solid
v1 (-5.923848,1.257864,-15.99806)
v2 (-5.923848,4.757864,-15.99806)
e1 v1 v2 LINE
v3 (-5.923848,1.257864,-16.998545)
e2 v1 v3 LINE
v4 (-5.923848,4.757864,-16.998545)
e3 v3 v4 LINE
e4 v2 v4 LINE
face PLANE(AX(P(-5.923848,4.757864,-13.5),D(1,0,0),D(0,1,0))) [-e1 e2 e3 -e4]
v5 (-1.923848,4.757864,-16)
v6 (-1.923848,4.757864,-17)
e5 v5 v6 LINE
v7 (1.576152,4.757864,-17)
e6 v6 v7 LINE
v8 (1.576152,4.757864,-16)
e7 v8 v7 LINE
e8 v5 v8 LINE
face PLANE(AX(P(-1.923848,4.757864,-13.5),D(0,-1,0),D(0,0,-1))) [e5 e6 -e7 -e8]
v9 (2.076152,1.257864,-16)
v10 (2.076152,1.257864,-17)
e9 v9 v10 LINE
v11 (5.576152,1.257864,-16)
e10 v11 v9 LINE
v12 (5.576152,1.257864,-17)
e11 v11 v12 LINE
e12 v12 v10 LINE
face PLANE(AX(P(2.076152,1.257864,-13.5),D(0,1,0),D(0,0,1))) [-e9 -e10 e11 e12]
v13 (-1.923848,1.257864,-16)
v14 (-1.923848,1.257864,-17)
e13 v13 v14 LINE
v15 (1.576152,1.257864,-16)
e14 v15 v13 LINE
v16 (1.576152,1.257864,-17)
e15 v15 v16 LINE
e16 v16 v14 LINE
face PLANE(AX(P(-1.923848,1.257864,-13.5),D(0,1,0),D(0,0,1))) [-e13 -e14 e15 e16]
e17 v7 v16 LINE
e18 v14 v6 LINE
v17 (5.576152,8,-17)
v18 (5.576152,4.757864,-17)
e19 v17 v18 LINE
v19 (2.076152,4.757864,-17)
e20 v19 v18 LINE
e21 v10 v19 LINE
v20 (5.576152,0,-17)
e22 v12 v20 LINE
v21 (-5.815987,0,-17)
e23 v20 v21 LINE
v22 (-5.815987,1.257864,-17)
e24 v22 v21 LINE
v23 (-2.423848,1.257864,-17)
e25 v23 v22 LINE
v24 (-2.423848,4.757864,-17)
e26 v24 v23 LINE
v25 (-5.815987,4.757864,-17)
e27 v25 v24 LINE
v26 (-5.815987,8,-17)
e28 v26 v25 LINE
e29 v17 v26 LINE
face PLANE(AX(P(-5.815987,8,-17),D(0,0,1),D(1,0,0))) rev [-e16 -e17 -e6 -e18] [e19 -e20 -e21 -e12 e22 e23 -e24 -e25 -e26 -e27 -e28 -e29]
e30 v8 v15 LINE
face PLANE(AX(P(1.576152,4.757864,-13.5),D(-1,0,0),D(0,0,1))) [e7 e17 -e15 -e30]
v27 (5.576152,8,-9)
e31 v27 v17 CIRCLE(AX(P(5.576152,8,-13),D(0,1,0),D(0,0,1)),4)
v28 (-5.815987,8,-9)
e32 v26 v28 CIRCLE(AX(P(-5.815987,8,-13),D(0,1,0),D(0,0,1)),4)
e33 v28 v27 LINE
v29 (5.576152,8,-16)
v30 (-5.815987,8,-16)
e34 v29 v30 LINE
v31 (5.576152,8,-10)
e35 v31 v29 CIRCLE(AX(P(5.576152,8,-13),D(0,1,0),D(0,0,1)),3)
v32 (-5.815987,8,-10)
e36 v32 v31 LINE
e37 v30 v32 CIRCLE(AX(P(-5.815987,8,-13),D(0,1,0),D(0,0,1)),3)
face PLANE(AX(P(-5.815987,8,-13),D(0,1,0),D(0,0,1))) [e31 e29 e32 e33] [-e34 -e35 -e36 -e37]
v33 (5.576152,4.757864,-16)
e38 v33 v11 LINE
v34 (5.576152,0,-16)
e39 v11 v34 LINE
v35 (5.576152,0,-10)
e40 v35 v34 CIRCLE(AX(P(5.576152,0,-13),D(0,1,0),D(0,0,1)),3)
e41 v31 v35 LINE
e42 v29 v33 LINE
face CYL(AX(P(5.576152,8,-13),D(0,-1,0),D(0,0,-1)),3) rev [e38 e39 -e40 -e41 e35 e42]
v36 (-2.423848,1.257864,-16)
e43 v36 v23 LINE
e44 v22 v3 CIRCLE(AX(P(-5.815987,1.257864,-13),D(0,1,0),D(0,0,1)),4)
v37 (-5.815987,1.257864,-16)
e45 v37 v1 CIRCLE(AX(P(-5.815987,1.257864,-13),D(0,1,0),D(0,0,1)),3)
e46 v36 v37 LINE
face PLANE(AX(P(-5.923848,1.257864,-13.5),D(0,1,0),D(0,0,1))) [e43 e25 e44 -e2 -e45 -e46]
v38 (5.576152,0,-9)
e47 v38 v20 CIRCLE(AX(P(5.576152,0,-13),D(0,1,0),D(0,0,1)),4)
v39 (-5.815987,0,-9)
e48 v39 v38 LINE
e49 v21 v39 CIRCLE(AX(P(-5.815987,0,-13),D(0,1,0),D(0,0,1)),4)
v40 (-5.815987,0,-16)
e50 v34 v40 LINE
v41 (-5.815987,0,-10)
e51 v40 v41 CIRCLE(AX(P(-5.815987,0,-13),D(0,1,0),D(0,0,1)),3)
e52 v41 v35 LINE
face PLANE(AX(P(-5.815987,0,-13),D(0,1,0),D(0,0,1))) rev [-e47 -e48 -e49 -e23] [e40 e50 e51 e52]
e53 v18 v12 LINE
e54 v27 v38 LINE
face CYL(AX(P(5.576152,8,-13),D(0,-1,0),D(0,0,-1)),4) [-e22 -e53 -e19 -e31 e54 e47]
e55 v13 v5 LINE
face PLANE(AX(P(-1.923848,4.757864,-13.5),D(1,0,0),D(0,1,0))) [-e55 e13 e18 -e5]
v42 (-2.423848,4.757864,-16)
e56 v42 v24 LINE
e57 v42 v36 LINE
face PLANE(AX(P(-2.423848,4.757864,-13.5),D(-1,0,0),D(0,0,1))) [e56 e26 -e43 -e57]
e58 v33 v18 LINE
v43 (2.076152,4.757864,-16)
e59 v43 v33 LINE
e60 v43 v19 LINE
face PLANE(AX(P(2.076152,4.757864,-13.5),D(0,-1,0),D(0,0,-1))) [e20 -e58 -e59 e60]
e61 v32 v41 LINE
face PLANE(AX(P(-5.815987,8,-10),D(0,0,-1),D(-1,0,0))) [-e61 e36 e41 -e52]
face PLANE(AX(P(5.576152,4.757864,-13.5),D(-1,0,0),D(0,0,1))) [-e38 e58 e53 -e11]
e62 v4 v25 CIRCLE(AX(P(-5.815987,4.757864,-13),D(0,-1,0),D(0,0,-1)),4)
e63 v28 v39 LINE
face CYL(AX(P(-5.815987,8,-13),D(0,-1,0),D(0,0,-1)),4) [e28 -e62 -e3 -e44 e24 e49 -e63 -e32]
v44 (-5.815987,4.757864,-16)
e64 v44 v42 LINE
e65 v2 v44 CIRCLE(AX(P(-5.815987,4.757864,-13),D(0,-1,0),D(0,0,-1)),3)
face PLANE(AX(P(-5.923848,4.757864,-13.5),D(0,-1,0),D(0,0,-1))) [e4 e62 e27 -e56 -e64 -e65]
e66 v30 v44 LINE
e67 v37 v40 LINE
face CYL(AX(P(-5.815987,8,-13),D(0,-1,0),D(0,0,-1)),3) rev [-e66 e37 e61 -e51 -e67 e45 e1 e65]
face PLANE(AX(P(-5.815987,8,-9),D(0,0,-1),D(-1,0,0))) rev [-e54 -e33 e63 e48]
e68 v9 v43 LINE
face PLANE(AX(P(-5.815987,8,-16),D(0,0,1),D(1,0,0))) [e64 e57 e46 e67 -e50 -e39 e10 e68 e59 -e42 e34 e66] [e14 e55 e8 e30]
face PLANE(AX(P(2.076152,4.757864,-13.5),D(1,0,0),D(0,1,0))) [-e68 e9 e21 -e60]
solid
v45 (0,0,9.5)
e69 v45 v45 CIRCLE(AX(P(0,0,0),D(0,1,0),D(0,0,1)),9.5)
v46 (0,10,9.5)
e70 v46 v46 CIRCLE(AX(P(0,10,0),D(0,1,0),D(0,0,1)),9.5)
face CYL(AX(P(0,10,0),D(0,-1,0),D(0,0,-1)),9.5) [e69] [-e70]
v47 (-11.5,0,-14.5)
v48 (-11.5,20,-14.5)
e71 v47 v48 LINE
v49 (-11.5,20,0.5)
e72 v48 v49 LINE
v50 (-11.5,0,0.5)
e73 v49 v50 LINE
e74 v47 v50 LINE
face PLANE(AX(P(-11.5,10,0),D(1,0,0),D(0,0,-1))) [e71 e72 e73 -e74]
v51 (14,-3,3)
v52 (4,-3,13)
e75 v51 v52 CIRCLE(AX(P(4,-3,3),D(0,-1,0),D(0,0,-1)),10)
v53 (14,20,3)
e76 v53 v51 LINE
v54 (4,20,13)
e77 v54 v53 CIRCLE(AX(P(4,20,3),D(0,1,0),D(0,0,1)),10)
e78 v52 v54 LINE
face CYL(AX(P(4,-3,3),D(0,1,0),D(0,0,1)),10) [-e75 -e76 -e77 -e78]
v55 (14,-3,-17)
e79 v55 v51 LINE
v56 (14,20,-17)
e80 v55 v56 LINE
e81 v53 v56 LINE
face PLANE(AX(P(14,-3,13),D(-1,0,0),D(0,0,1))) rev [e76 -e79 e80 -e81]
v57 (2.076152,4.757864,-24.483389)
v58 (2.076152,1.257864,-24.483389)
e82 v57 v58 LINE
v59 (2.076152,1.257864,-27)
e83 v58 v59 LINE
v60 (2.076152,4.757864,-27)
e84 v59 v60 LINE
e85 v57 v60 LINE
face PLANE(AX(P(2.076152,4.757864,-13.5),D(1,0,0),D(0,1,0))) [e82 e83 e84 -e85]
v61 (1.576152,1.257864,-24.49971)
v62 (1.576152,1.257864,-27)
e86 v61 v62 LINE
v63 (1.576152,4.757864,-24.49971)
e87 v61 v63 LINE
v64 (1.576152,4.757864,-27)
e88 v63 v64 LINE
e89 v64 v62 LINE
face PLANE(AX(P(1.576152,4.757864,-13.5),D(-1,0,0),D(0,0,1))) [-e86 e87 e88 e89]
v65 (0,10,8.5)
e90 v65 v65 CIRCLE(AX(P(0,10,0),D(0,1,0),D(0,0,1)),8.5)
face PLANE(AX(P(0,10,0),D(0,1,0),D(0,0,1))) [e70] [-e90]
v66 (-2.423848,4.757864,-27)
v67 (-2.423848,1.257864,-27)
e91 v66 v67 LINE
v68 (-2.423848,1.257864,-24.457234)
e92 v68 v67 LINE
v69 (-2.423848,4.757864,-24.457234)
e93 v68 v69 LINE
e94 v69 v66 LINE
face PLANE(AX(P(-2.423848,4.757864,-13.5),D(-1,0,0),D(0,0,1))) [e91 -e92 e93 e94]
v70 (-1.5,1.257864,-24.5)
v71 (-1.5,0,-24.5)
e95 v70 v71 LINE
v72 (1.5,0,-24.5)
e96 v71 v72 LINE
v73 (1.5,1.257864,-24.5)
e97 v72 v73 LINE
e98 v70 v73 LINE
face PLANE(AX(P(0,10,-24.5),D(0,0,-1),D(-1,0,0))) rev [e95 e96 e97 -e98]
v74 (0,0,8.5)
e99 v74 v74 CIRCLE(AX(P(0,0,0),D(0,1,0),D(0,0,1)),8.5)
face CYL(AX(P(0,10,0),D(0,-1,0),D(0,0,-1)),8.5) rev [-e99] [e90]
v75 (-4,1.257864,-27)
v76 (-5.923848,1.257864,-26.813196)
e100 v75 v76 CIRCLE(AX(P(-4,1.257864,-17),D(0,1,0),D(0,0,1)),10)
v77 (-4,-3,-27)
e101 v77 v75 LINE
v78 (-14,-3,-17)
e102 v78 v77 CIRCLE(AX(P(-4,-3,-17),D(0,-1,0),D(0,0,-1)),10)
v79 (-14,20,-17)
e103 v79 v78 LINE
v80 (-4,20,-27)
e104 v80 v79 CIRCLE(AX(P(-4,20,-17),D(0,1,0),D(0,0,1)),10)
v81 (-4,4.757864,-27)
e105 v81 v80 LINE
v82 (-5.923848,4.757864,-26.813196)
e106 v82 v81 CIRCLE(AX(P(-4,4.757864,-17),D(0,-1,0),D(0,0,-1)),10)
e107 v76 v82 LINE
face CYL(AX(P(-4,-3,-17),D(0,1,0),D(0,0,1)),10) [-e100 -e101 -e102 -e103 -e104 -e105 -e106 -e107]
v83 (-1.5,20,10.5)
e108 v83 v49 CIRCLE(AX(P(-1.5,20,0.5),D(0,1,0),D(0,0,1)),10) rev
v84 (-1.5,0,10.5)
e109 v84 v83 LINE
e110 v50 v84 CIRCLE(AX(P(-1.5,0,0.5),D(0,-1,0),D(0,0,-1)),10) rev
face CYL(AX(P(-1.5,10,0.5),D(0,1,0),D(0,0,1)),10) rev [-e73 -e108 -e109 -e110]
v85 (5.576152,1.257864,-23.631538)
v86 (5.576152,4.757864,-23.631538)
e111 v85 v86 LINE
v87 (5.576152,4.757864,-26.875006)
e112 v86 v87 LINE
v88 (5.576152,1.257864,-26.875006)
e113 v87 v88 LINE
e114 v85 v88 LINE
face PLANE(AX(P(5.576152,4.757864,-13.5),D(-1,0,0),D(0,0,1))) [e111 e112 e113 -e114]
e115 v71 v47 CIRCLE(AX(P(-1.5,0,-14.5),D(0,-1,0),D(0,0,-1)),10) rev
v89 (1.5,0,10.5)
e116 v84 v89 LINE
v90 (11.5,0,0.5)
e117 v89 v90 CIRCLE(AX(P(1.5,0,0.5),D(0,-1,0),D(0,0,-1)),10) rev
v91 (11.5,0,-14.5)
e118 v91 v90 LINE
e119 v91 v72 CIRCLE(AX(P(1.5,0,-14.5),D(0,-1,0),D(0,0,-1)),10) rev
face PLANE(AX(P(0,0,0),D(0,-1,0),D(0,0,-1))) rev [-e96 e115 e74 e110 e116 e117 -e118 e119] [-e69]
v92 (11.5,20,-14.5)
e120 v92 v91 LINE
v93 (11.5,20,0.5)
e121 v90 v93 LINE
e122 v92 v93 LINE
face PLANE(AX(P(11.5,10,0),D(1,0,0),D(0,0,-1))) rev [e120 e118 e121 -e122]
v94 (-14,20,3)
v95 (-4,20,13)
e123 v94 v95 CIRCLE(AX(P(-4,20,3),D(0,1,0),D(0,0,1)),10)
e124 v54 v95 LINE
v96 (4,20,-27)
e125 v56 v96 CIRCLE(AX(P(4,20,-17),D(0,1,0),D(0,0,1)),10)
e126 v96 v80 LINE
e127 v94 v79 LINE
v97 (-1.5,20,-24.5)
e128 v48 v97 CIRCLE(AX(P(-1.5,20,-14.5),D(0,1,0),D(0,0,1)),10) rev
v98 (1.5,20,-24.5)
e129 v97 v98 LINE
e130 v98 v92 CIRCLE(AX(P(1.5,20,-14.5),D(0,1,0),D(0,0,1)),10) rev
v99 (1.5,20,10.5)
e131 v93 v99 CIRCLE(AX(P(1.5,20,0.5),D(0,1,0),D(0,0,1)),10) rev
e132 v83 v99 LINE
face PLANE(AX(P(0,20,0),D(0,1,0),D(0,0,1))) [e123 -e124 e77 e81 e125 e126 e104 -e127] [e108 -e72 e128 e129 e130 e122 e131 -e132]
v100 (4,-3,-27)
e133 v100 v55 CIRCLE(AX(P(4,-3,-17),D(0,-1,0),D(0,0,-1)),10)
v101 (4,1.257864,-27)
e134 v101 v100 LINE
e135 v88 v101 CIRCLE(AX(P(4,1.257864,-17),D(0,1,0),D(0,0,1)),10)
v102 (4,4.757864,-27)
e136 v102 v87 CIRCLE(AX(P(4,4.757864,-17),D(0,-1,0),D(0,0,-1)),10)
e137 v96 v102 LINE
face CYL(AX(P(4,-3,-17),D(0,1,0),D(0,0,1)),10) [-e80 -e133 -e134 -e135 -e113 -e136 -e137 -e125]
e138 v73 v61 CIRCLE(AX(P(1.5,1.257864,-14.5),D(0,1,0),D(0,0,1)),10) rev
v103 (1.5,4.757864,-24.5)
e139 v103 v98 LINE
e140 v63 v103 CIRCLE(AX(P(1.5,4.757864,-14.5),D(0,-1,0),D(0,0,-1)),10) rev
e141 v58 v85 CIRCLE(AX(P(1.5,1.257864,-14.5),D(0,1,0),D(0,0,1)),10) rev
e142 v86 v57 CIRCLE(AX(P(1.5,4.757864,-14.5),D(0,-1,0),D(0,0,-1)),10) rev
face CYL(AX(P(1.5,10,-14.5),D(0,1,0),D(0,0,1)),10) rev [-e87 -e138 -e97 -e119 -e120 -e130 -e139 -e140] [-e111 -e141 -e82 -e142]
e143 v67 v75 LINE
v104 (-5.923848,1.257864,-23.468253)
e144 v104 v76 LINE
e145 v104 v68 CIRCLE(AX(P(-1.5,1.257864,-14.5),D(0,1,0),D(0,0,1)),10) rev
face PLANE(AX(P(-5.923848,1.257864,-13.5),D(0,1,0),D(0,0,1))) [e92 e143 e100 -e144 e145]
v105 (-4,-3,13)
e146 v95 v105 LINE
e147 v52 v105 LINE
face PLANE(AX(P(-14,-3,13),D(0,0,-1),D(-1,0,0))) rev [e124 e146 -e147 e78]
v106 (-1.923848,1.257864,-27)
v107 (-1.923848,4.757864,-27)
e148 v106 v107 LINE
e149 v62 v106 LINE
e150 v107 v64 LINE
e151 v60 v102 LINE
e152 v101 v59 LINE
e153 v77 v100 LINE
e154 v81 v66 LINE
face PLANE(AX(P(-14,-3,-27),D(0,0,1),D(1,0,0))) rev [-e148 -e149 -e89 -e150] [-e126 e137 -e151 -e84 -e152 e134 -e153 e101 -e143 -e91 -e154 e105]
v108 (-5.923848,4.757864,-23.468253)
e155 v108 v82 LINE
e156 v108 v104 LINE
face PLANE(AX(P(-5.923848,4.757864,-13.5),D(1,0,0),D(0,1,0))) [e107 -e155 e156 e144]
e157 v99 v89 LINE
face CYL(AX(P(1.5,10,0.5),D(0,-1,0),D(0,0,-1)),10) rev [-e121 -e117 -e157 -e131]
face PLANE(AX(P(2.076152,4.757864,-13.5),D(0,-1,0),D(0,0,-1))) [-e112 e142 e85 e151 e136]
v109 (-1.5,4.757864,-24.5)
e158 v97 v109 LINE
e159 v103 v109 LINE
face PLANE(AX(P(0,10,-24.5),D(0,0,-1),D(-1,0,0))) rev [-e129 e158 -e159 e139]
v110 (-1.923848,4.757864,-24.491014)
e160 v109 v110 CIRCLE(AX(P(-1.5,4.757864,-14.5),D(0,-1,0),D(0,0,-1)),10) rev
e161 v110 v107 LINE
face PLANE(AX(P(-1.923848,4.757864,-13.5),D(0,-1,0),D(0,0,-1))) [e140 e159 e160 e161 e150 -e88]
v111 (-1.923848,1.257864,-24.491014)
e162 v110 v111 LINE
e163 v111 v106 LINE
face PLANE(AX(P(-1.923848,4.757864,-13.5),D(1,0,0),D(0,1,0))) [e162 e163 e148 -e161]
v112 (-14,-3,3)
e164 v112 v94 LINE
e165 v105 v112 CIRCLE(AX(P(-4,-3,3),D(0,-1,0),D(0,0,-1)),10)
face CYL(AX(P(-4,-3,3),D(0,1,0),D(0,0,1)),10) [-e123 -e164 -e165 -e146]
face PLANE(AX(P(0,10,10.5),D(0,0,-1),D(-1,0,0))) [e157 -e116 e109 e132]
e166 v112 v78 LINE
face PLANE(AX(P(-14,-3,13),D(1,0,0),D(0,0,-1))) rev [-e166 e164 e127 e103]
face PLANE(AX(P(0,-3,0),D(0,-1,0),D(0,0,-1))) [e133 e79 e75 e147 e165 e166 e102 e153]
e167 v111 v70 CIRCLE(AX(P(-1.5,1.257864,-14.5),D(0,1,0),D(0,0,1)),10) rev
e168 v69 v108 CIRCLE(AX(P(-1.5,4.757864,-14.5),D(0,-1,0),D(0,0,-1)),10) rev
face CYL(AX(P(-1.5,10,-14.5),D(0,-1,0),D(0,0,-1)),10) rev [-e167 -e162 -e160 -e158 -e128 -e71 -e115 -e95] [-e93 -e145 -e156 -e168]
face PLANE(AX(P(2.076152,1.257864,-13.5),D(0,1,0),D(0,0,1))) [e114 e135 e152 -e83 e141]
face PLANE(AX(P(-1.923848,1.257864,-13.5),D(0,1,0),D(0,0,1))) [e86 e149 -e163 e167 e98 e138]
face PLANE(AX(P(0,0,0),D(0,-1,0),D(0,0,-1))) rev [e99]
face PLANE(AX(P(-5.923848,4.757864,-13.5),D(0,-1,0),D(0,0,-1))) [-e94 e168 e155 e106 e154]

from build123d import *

# Parameters (mm, degrees)
SKETCH1_W               = 28
SKETCH1_H               = 40
SKETCH1_W_2             = 23
SKETCH1_H_2             = 35
BOSS_EXTRUDE4_DEPTH     = 10
SKETCH1_R               = 9.5
SKETCH1_R_2             = 8.5
BOSS_EXTRUDE4_2_DEPTH   = 10
SKETCH1_5_W             = 28
SKETCH1_5_H             = 40
SKETCH1_5_W_2           = 23
SKETCH1_5_H_2           = 35
BOSS_EXTRUDE5_DEPTH     = 20
SKETCH3_W               = 28
SKETCH3_H               = 40
BOSS_EXTRUDE6_DEPTH     = 3
BOSS_EXTRUDE9_DEPTH     = 8
CUT_EXTRUDE2_DEPTH      = 11
CUT_EXTRUDE2_DEPTH_BACK = 8
SKETCH6_W               = 3.5
SKETCH6_H               = 3.5
FILLET1_R               = 10


with BuildPart() as part:
    # Sketch1 → Boss-Extrude4 (new body)
    with BuildSketch(Plane(origin=(0, 0, 0), x_dir=(1, 0, 0), z_dir=(0, 1, 0))):
        with Locations((0, 7)):
            Rectangle(SKETCH1_W, SKETCH1_H)
        with Locations((0, 7)):
            Rectangle(SKETCH1_W_2, SKETCH1_H_2, mode=Mode.SUBTRACT)
    extrude(amount=BOSS_EXTRUDE4_DEPTH)

    # Sketch1<5> → Boss-Extrude5 (add)
    with BuildSketch(Plane(origin=(0, 0, 0), x_dir=(1, 0, 0), z_dir=(0, 1, 0))):
        with Locations((0, 7)):
            Rectangle(SKETCH1_5_W, SKETCH1_5_H)
        with Locations((0, 7)):
            Rectangle(SKETCH1_5_W_2, SKETCH1_5_H_2, mode=Mode.SUBTRACT)
    extrude(amount=BOSS_EXTRUDE5_DEPTH)



with BuildPart() as body_2:
    # Sketch1 → Boss-Extrude4 2 (new body)
    with BuildSketch(Plane(origin=(0, 0, 0), x_dir=(1, 0, 0), z_dir=(0, 1, 0))):
        with Locations(Location((0, 0, 0), (0, 0, 270))):
            Circle(SKETCH1_R)
        with Locations(Location((0, 0, 0), (0, 0, 270))):
            Circle(SKETCH1_R_2, mode=Mode.SUBTRACT)
    extrude(amount=BOSS_EXTRUDE4_2_DEPTH)


with BuildPart() as part_1:
    add(part.part)

    add(body_2.part)  # Boss-Extrude6 merges body 2
    # Sketch3 → Boss-Extrude6 (add)
    with BuildSketch(Plane.XZ):
        with Locations((0, -7)):
            Rectangle(SKETCH3_W, SKETCH3_H)
    extrude(amount=BOSS_EXTRUDE6_DEPTH)


with BuildPart() as body_2_2:
    # Sketch4 → Boss-Extrude9 (new body)
    with BuildSketch(Plane(origin=(0, 0, 0), x_dir=(1, 0, 0), z_dir=(0, 1, 0))):
        with BuildLine():
            Line((-5.815986723, 17), (5.576152219, 17))
            ThreePointArc((5.576152219, 17), (9.576152219, 13), (5.576152219, 9))
            Line((5.576152219, 9), (-5.815986723, 9))
            ThreePointArc((-5.815986723, 9), (-9.815986723, 13), (-5.815986723, 17))
        make_face()
        with BuildLine():
            Line((-5.815986723, 16), (5.576152219, 16))
            ThreePointArc((5.576152219, 16), (8.576152219, 13), (5.576152219, 10))
            Line((5.576152219, 10), (-5.815986723, 10))
            ThreePointArc((-5.815986723, 10), (-8.815986723, 13), (-5.815986723, 16))
        make_face(mode=Mode.SUBTRACT)
    extrude(amount=BOSS_EXTRUDE9_DEPTH)


with BuildPart() as cut_extrude2_tool:
    # Sketch6 → Cut-Extrude2 (new, two sides: drawn at the far end of the back side and taken through both)
    with BuildSketch(Plane.XY.offset(-24.5).offset(-CUT_EXTRUDE2_DEPTH_BACK)):
        with Locations((3.826152219, 3.007864186)):
            Rectangle(SKETCH6_W, SKETCH6_H)
        with Locations((-0.173847781, 3.007864186)):
            Rectangle(SKETCH6_W, SKETCH6_H)
        with Locations((-4.173847781, 3.007864186)):
            Rectangle(SKETCH6_W, SKETCH6_H)
    extrude(amount=CUT_EXTRUDE2_DEPTH + CUT_EXTRUDE2_DEPTH_BACK)


with BuildPart() as part_2:
    add(part_1.part)

    # Cut-Extrude2: cut by cut_extrude2_tool
    add(cut_extrude2_tool.part, mode=Mode.SUBTRACT)

    # Fillet1
    # the kernel refuses this fillet: 10 mm, written as the material it adds along each edge
    with BuildSketch(Plane(origin=(-11.5, 20, 10.5), x_dir=(0, 0, -1), z_dir=(0, -1, 0)), Plane(origin=(11.5, 20, 10.5), x_dir=(-1, 0, 0), z_dir=(0, -1, 0))) as fillet1_piece_1:
        with BuildLine():
            CenterArc((FILLET1_R, FILLET1_R), FILLET1_R, 180, 90)
            Line((0, FILLET1_R), (0, 0))
            Line((0, 0), (FILLET1_R, 0))
        make_face()
    extrude(amount=20)
    with BuildSketch(Plane(origin=(11.5, 20, -24.5), x_dir=(0, 0, 1), z_dir=(0, -1, 0))) as fillet1_piece_2_section:
        with BuildLine():
            CenterArc((FILLET1_R, FILLET1_R), FILLET1_R, 180, 90)
            Line((0, FILLET1_R), (0, 0))
            Line((0, 0), (FILLET1_R, 0))
        make_face()
    fillet1_piece_2 = extrude(amount=45, mode=Mode.PRIVATE)
    fillet1_piece_2 = split(fillet1_piece_2, bisect_by=Plane(origin=(9.534581137, 4.757864186, -22.153586086), z_dir=(0, 1, 0)), keep=Keep.TOP, mode=Mode.PRIVATE)
    add(fillet1_piece_2)
    with BuildSketch(Plane(origin=(11.5, 45, -24.5), x_dir=(0, 0, 1), z_dir=(0, -1, 0))) as fillet1_piece_3_section:
        with BuildLine():
            CenterArc((FILLET1_R, FILLET1_R), FILLET1_R, 180, 90)
            Line((0, FILLET1_R), (0, 0))
            Line((0, 0), (FILLET1_R, 0))
        make_face()
    fillet1_piece_3 = extrude(amount=45, mode=Mode.PRIVATE)
    fillet1_piece_3 = split(fillet1_piece_3, bisect_by=Plane(origin=(9.534581137, 4.757864186, -22.153586086), z_dir=(0, -1, 0)), keep=Keep.TOP, mode=Mode.PRIVATE)
    fillet1_piece_3 = split(fillet1_piece_3, bisect_by=Plane(origin=(5.576152219, 3.007864186, -22.153586086), z_dir=(1, 0, 0)), keep=Keep.TOP, mode=Mode.PRIVATE)
    add(fillet1_piece_3)
    with BuildSketch(Plane(origin=(11.5, 45, -24.5), x_dir=(0, 0, 1), z_dir=(0, -1, 0))) as fillet1_piece_4_section:
        with BuildLine():
            CenterArc((FILLET1_R, FILLET1_R), FILLET1_R, 180, 90)
            Line((0, FILLET1_R), (0, 0))
            Line((0, 0), (FILLET1_R, 0))
        make_face()
    fillet1_piece_4 = extrude(amount=45, mode=Mode.PRIVATE)
    fillet1_piece_4 = split(fillet1_piece_4, bisect_by=Plane(origin=(1.933005634, 4.757864186, -24.495005975), z_dir=(0, -1, 0)), keep=Keep.TOP, mode=Mode.PRIVATE)
    fillet1_piece_4 = split(fillet1_piece_4, bisect_by=Plane(origin=(2.076152219, 3.007864186, -24.495005975), z_dir=(-1, 0, 0)), keep=Keep.TOP, mode=Mode.PRIVATE)
    fillet1_piece_4 = split(fillet1_piece_4, bisect_by=Plane(origin=(1.576152219, 3.007864186, -24.495005975), z_dir=(1, 0, 0)), keep=Keep.TOP, mode=Mode.PRIVATE)
    add(fillet1_piece_4)
    with BuildSketch(Plane(origin=(11.5, 45, -24.5), x_dir=(0, 0, 1), z_dir=(0, -1, 0))) as fillet1_piece_5_section:
        with BuildLine():
            CenterArc((FILLET1_R, FILLET1_R), FILLET1_R, 180, 90)
            Line((0, FILLET1_R), (0, 0))
            Line((0, 0), (FILLET1_R, 0))
        make_face()
    fillet1_piece_5 = extrude(amount=45, mode=Mode.PRIVATE)
    fillet1_piece_5 = split(fillet1_piece_5, bisect_by=Plane(origin=(4.573444491, 1.257864186, -24.240822934), z_dir=(0, -1, 0)), keep=Keep.TOP, mode=Mode.PRIVATE)
    add(fillet1_piece_5)
    with BuildSketch(Plane(origin=(-11.5, 0, -24.5), x_dir=(0, 0, 1), z_dir=(0, 1, 0))) as fillet1_piece_6_section:
        with BuildLine():
            CenterArc((FILLET1_R, FILLET1_R), FILLET1_R, 180, 90)
            Line((0, FILLET1_R), (0, 0))
            Line((0, 0), (FILLET1_R, 0))
        make_face()
    fillet1_piece_6 = extrude(amount=45, mode=Mode.PRIVATE)
    fillet1_piece_6 = split(fillet1_piece_6, bisect_by=Plane(origin=(-9.597009407, 1.257864186, -22.122684576), z_dir=(0, -1, 0)), keep=Keep.TOP, mode=Mode.PRIVATE)
    add(fillet1_piece_6)
    with BuildSketch(Plane(origin=(-11.5, 0, -24.5), x_dir=(0, 0, 1), z_dir=(0, 1, 0))) as fillet1_piece_7_section:
        with BuildLine():
            CenterArc((FILLET1_R, FILLET1_R), FILLET1_R, 180, 90)
            Line((0, FILLET1_R), (0, 0))
            Line((0, 0), (FILLET1_R, 0))
        make_face()
    fillet1_piece_7 = extrude(amount=20, mode=Mode.PRIVATE)
    fillet1_piece_7 = split(fillet1_piece_7, bisect_by=Plane(origin=(-5.923847781, 3.007864186, -22.122684576), z_dir=(-1, 0, 0)), keep=Keep.TOP, mode=Mode.PRIVATE)
    add(fillet1_piece_7)
    with BuildSketch(Plane(origin=(-11.5, 0, -24.5), x_dir=(0, 0, 1), z_dir=(0, 1, 0))) as fillet1_piece_8_section:
        with BuildLine():
            CenterArc((FILLET1_R, FILLET1_R), FILLET1_R, 180, 90)
            Line((0, FILLET1_R), (0, 0))
            Line((0, 0), (FILLET1_R, 0))
        make_face()
    fillet1_piece_8 = extrude(amount=20, mode=Mode.PRIVATE)
    fillet1_piece_8 = split(fillet1_piece_8, bisect_by=Plane(origin=(-2.423847781, 3.007864186, -24.486093352), z_dir=(1, 0, 0)), keep=Keep.TOP, mode=Mode.PRIVATE)
    fillet1_piece_8 = split(fillet1_piece_8, bisect_by=Plane(origin=(-1.923847781, 3.007864186, -24.486093352), z_dir=(-1, 0, 0)), keep=Keep.TOP, mode=Mode.PRIVATE)
    add(fillet1_piece_8)
    with BuildSketch(Plane(origin=(-11.5, -25, -24.5), x_dir=(0, 0, 1), z_dir=(0, 1, 0))) as fillet1_piece_9_section:
        with BuildLine():
            CenterArc((FILLET1_R, FILLET1_R), FILLET1_R, 180, 90)
            Line((0, FILLET1_R), (0, 0))
            Line((0, 0), (FILLET1_R, 0))
        make_face()
    fillet1_piece_9 = extrude(amount=45, mode=Mode.PRIVATE)
    fillet1_piece_9 = split(fillet1_piece_9, bisect_by=Plane(origin=(-4.853134355, 4.757864186, -24.190800043), z_dir=(0, 1, 0)), keep=Keep.TOP, mode=Mode.PRIVATE)
    add(fillet1_piece_9)
    # the kernel refuses this fillet: 10 mm, written as the material it takes off along each edge
    with BuildSketch(Plane(origin=(-14, 45, -27), x_dir=(0, 0, 1), z_dir=(0, -1, 0)), Plane(origin=(14, -28, 13), x_dir=(-1, 0, 0), z_dir=(0, 1, 0)), Plane(origin=(-14, -28, 13), x_dir=(0, 0, -1), z_dir=(0, 1, 0))) as fillet1_2_piece_1:
        with BuildLine():
            CenterArc((FILLET1_R, -FILLET1_R), FILLET1_R, 90, 90)
            Line((0, -FILLET1_R), (0, 0))
            Line((0, 0), (FILLET1_R, 0))
        make_face()
    extrude(amount=73, mode=Mode.SUBTRACT)
    with BuildSketch(Plane(origin=(14, 45, -27), x_dir=(0, 0, 1), z_dir=(0, -1, 0))) as fillet1_2_piece_2:
        with BuildLine():
            CenterArc((FILLET1_R, FILLET1_R), FILLET1_R, 180, 90)
            Line((0, FILLET1_R), (0, 0))
            Line((0, 0), (FILLET1_R, 0))
        make_face()
    extrude(amount=73, mode=Mode.SUBTRACT)


with BuildPart() as body_2_2_1:
    add(body_2_2.part)

    # Cut-Extrude2: cut by cut_extrude2_tool
    add(cut_extrude2_tool.part, mode=Mode.SUBTRACT)


solid = Compound([part_2.part, body_2_2_1.part])
